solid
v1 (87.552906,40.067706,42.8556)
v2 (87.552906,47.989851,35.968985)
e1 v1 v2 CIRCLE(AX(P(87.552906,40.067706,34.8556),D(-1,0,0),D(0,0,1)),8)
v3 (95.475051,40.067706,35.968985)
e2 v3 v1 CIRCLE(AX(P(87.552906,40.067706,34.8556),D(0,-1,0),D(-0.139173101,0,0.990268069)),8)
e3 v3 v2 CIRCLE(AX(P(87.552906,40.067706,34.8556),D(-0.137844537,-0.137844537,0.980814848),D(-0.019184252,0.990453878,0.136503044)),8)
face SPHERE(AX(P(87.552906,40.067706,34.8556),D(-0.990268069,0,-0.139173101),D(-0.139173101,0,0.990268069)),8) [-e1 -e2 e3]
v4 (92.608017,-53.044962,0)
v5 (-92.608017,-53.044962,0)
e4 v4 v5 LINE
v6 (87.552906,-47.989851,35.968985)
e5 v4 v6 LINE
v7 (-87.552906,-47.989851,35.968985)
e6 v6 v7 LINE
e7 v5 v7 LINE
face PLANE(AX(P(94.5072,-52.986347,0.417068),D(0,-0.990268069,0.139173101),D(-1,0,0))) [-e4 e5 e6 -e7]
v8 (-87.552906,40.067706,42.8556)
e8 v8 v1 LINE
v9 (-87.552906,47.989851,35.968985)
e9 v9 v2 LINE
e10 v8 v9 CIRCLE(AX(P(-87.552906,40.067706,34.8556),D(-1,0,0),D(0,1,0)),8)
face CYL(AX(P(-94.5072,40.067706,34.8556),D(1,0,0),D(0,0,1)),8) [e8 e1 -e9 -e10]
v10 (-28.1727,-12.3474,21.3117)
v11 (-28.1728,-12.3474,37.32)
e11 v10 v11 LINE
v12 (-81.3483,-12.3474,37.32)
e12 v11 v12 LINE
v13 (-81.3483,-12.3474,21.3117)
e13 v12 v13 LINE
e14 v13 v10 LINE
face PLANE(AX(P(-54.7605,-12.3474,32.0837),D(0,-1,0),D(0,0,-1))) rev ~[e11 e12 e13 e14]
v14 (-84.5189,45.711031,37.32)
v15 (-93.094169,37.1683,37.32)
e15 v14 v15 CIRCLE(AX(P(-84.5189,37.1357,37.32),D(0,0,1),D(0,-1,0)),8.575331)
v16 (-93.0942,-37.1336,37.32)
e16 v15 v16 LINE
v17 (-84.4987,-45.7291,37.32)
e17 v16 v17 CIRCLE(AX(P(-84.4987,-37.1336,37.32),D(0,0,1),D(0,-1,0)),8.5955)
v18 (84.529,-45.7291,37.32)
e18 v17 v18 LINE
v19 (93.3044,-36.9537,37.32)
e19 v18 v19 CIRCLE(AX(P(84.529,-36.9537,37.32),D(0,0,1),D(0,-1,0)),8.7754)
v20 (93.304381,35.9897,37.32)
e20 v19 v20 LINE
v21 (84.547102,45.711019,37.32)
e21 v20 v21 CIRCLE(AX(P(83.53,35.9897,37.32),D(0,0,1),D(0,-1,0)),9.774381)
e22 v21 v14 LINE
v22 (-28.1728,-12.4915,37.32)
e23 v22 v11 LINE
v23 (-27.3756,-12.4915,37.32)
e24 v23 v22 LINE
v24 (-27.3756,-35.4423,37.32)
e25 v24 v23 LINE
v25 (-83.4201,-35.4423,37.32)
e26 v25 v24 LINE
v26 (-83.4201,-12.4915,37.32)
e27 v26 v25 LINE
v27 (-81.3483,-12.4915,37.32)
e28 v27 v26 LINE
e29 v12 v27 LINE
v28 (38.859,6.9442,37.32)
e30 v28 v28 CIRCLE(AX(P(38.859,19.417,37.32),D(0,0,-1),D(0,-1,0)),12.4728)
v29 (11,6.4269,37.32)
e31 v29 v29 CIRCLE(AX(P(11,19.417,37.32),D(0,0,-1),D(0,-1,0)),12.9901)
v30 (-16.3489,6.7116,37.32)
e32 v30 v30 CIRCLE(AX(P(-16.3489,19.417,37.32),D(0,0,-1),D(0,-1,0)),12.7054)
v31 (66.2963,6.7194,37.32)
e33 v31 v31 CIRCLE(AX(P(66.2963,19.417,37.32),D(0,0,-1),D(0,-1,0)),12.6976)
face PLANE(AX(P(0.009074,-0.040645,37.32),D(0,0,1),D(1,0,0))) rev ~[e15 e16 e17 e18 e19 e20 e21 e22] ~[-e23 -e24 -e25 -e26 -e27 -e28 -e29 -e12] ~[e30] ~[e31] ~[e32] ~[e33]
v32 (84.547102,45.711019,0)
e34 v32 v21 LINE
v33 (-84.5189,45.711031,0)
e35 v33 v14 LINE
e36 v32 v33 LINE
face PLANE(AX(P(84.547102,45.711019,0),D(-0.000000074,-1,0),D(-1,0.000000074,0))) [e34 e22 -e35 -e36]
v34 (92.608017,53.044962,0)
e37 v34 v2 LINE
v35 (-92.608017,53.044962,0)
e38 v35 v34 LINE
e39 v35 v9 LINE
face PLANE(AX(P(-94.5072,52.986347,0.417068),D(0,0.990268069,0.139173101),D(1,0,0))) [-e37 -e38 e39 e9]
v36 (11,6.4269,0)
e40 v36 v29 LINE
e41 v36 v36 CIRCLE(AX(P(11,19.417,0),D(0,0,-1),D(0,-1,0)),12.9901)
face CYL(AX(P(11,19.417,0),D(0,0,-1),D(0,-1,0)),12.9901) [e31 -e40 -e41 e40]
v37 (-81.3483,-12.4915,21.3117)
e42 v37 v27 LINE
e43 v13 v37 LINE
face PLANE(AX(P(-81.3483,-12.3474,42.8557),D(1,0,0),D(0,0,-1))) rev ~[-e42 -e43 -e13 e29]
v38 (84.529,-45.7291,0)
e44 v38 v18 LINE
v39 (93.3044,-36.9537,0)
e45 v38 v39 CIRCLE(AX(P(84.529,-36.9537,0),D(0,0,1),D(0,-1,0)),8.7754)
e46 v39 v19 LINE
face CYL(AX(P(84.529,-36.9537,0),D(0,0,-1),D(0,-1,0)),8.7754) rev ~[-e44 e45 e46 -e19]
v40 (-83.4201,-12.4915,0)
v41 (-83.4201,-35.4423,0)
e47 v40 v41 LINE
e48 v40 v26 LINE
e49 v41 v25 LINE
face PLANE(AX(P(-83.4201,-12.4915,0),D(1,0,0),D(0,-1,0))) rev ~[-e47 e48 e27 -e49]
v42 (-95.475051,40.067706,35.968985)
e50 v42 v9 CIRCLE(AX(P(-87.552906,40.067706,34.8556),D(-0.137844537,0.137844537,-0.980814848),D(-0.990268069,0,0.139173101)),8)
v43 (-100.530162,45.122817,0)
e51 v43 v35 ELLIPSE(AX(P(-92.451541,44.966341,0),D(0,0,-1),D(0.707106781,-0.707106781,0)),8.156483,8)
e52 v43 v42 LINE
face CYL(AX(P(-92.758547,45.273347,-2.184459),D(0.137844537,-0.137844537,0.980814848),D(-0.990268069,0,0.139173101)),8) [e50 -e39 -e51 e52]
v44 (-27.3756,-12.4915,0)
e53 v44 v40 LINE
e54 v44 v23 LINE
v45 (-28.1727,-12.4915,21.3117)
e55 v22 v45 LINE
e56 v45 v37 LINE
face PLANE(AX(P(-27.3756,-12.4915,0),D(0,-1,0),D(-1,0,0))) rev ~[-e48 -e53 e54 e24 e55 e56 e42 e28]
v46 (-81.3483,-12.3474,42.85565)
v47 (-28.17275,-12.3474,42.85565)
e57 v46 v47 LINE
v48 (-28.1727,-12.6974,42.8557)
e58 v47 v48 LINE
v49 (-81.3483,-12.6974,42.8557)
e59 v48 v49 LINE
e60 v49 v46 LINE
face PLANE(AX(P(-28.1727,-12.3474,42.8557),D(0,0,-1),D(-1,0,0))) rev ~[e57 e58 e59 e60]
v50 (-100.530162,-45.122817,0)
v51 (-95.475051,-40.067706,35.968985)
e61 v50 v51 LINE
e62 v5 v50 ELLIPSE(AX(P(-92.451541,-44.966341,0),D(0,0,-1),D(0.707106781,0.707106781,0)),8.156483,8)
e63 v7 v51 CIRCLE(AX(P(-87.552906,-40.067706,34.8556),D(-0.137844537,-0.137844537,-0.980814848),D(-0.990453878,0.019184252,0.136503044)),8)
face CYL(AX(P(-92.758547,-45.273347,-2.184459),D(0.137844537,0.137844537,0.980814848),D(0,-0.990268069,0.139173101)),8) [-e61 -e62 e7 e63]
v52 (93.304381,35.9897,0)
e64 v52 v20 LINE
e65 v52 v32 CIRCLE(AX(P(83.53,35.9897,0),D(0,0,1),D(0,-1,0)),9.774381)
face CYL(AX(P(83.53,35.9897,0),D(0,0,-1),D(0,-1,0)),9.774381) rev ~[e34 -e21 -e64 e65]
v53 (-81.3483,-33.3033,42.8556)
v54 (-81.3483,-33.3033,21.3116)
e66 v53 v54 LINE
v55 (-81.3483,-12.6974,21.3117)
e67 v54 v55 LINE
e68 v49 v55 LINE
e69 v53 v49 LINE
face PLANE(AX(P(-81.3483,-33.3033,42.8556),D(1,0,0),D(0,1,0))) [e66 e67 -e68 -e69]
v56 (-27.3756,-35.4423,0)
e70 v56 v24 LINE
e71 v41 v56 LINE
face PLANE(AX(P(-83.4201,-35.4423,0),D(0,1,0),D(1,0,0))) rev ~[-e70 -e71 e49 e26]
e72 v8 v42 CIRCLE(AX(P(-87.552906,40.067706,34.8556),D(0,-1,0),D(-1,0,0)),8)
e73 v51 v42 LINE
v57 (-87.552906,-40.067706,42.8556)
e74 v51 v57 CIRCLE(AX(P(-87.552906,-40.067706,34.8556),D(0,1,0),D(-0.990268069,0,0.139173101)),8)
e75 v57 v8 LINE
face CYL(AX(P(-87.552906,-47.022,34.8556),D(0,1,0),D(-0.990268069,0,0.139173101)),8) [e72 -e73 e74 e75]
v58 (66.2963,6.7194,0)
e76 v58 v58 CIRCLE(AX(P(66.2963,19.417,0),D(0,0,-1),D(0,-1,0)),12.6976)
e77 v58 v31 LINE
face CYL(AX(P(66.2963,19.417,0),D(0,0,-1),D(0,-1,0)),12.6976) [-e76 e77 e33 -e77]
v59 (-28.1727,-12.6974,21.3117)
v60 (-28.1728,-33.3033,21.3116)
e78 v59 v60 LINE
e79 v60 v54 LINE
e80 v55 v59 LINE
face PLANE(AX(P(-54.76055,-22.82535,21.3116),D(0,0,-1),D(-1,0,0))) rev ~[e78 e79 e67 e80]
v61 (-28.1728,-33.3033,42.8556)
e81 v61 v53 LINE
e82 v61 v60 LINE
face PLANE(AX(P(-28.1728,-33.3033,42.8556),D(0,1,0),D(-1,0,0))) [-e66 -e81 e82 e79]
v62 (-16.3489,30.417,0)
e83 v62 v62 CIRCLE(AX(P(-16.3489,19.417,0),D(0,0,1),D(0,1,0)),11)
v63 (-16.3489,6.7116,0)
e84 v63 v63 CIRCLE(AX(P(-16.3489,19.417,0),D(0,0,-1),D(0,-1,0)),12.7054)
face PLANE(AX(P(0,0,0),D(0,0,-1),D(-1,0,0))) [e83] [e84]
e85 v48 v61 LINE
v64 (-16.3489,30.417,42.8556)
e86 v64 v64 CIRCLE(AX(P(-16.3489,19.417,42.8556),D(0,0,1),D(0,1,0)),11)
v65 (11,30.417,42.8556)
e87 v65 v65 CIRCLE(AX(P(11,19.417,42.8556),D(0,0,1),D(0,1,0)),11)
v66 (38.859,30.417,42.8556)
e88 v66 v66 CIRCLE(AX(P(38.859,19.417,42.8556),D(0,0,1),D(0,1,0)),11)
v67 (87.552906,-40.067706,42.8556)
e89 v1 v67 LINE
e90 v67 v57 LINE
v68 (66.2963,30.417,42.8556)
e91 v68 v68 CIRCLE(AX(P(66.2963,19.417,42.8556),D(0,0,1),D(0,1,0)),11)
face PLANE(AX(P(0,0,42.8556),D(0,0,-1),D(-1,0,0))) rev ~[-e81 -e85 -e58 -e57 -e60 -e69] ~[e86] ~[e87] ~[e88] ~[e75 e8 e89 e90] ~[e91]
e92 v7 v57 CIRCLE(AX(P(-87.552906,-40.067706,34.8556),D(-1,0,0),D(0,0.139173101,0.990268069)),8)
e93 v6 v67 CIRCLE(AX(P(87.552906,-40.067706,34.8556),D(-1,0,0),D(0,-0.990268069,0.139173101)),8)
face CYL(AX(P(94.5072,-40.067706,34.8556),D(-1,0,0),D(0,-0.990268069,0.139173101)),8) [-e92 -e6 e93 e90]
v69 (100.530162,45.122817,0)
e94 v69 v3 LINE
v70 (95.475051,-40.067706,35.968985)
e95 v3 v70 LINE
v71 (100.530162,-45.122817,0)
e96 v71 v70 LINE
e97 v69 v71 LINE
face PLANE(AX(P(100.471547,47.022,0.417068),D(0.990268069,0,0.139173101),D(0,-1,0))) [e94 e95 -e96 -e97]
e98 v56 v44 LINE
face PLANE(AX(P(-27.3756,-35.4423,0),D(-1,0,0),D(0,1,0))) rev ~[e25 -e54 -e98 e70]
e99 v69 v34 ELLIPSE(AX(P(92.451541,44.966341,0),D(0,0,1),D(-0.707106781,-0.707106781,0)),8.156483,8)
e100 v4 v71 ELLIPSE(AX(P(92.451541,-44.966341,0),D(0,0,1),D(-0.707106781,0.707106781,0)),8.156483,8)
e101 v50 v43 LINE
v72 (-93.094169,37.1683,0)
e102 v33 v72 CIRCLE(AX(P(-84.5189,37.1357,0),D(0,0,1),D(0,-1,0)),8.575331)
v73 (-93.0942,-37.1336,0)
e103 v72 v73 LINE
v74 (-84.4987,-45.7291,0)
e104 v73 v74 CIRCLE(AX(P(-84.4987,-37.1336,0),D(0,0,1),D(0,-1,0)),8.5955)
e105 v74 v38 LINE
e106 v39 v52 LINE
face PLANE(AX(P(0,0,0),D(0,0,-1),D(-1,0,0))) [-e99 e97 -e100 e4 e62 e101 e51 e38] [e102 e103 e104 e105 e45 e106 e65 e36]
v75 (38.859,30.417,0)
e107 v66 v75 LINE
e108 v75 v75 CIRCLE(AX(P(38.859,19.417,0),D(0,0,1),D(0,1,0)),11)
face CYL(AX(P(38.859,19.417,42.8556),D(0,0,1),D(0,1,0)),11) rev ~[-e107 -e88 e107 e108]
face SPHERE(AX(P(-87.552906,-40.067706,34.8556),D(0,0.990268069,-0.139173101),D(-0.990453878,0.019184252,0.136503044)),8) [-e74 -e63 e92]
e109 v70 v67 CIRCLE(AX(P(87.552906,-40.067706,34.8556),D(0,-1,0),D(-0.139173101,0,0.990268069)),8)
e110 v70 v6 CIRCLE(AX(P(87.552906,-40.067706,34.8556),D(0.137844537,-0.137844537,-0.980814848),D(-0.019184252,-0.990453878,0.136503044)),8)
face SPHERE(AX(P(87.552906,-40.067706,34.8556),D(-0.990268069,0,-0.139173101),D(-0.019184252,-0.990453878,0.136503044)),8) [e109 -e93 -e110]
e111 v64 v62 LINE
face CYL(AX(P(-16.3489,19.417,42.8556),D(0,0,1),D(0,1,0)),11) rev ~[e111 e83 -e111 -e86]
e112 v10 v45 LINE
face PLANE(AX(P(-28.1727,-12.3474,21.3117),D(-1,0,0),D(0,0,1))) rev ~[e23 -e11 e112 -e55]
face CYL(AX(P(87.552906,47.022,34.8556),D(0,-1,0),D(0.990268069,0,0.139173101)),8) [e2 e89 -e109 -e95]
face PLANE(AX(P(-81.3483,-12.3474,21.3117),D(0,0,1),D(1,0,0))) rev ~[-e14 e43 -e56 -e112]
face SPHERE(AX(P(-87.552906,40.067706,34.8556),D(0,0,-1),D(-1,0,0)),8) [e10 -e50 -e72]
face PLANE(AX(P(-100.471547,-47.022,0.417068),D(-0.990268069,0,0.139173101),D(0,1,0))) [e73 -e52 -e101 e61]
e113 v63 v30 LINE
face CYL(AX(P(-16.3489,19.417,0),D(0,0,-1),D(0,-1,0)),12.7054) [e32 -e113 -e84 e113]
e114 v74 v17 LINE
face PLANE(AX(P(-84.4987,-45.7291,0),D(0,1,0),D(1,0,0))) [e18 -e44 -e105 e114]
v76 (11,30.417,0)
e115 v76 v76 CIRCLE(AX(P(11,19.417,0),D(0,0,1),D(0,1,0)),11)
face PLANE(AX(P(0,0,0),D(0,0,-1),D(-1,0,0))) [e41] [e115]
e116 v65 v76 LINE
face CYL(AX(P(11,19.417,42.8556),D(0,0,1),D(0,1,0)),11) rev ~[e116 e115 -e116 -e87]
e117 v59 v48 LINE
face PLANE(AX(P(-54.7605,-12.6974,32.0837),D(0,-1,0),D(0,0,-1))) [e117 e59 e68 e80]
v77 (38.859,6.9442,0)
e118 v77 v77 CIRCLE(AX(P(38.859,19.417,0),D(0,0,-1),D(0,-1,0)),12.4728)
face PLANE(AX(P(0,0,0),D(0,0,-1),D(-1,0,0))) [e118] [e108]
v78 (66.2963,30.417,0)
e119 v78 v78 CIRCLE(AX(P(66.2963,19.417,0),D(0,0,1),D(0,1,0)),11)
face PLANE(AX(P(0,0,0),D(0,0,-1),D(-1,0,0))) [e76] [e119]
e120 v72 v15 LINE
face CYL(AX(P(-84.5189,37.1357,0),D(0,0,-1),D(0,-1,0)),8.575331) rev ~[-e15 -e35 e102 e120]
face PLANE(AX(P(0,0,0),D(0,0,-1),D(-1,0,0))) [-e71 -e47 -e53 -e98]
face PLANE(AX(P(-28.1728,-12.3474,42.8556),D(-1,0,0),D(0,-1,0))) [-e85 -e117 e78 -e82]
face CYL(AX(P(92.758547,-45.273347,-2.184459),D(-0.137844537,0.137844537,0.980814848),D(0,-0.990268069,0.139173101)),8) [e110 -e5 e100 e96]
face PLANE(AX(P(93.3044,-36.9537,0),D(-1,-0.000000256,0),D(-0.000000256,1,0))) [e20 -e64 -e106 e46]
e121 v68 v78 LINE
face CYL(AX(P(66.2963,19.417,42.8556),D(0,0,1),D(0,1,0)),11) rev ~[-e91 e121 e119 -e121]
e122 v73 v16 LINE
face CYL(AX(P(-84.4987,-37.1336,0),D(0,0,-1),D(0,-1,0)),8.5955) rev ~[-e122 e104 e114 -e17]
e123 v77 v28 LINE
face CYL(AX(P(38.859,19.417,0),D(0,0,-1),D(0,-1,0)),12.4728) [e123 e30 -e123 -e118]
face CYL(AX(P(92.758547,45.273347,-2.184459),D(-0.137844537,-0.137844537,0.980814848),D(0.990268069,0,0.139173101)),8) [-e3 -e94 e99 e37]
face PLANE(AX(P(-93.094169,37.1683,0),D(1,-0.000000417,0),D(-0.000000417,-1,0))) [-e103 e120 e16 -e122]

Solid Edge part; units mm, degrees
sketch "Sketch1" plane through (0, 0, 0) normal (0, 0, 1) x (1, 0, 0)
  line L0 (94.5072, -47.022) -> (-94.5072, -47.022)
  line L1 (-94.5072, -47.022) -> (-94.5072, 47.022)
  line L2 (-94.5072, 47.022) -> (94.5072, 47.022)
  line L3 (94.5072, 47.022) -> (94.5072, -47.022)
extrude "Protrusion1" add sketch "Sketch1" along normal blind 42.8556
sketch "Sketch2" plane through (0, 0, 42.8556) normal (0, 0, 1) x (0, 1, 0)
  line L0 (-12.3474, 81.3483) -> (-12.3474, 28.1728)
  line L1 (-12.3474, 28.1728) -> (-33.3033, 28.1728)
  line L2 (-33.3033, 28.1728) -> (-33.3033, 81.3483)
  line L3 (-33.3033, 81.3483) -> (-12.3474, 81.3483)
extrude "ExtrudedCutout_1" cut sketch "Sketch2" against normal blind 21.544
sketch "Sketch3" plane through (0, 0, 42.8556) normal (0, 0, 1) x (0, 1, 0)
  circle A0 centre (19.417, 16.3489) radius 11
  circle A1 centre (19.417, -11) radius 11
  circle A2 centre (19.417, -38.859) radius 11
  circle A3 centre (19.417, -66.2963) radius 11
extrude "ExtrudedCutout_2" cut sketch "Sketch3" against normal blind 103.4341
sketch "Sketch4" plane through (0, 0, 0) normal (0, 0, -1) x (0, -1, 0)
  line L0 (12.4915, 83.4201) -> (35.4423, 83.4201)
  line L1 (35.4423, 83.4201) -> (35.4423, 27.3756)
  line L2 (35.4423, 27.3756) -> (12.4915, 27.3756)
  line L3 (12.4915, 27.3756) -> (12.4915, 83.4201)
  circle A0 centre (-19.417, 16.3489) radius 12.7054
  circle A1 centre (-19.417, -11) radius 12.9901
  circle A2 centre (-19.417, -38.859) radius 12.4728
  circle A3 centre (-19.417, -66.2963) radius 12.6976
  line L4 (-37.1683, 93.0942) -> (37.1336, 93.0942)
  arc A4 (37.1336, 93.0942) -> (45.7291, 84.4987) centre (37.1336, 84.4987) cw
  line L5 (45.7291, 84.4987) -> (45.7291, -84.529)
  arc A5 (45.7291, -84.529) -> (36.9537, -93.3044) centre (36.9537, -84.529) cw
  line L6 (36.9537, -93.3044) -> (-35.9897, -93.3044)
  arc A6 (-35.9897, -93.3044) -> (-45.711, -84.5471) centre (-35.9897, -83.53) cw
  line L7 (-45.711, -84.5471) -> (-45.711, 84.5189)
  arc A7 (-45.711, 84.5189) -> (-37.1683, 93.0942) centre (-37.1357, 84.5189) cw
extrude "Cutout_3" cut sketch "Sketch4" against normal blind 37.32
sketch "Sketch5" plane through (-55.3979, -12.4915, 18.6615) normal (0, 1, 0) x (-1, 0, 0)
  line L0 (-27.2251, 18.6585) -> (25.9504, 18.6585)
  line L1 (25.9504, 18.6585) -> (25.9504, 2.6501)
  line L2 (25.9504, 2.6501) -> (-27.2251, 2.6501)
  line L3 (-27.2251, 2.6501) -> (-27.2251, 18.6585)
extrude "ExtrudedProtrusion_2" add sketch "Sketch5" against normal blind 0.0041
sketch "Sketch6" plane through (-54.7605, -12.3474, 40.0894) normal (0, -1, 0) x (-1, 0, 0)
  line L0 (-26.5878, -2.7663) -> (26.5878, -2.7663)
  line L1 (26.5878, -2.7663) -> (26.5878, 18.7777)
  line L2 (26.5878, 18.7777) -> (-26.5878, 18.7777)
  line L3 (-26.5878, 18.7777) -> (-26.5878, -2.7663)
extrude "ExtrudedProtrusion_3" add sketch "Sketch6" along normal blind 0.35
draft "Draft_7" angle 8 neutral plane through (0, 0, 42.8556) normal (0, 0, 1) pull direction (0, 0, 1) face at (94.5072, 32.2884, 35.2844) face at (-64.8949, 47.022, 35.2844) face at (-94.5072, -32.2884, 35.2844) face at (64.8949, -47.022, 35.2844)
fillet "Round_1" radius 8 8 edges at (-97.5187, 50.0335, 21.4278) (-94.5072, 0, 42.8556) (0, 47.022, 42.8556) (-97.5187, -50.0335, 21.4278) (0, -47.022, 42.8556) (97.5187, -50.0335, 21.4278) (94.5072, 0, 42.8556) (97.5187, 50.0335, 21.4278)
